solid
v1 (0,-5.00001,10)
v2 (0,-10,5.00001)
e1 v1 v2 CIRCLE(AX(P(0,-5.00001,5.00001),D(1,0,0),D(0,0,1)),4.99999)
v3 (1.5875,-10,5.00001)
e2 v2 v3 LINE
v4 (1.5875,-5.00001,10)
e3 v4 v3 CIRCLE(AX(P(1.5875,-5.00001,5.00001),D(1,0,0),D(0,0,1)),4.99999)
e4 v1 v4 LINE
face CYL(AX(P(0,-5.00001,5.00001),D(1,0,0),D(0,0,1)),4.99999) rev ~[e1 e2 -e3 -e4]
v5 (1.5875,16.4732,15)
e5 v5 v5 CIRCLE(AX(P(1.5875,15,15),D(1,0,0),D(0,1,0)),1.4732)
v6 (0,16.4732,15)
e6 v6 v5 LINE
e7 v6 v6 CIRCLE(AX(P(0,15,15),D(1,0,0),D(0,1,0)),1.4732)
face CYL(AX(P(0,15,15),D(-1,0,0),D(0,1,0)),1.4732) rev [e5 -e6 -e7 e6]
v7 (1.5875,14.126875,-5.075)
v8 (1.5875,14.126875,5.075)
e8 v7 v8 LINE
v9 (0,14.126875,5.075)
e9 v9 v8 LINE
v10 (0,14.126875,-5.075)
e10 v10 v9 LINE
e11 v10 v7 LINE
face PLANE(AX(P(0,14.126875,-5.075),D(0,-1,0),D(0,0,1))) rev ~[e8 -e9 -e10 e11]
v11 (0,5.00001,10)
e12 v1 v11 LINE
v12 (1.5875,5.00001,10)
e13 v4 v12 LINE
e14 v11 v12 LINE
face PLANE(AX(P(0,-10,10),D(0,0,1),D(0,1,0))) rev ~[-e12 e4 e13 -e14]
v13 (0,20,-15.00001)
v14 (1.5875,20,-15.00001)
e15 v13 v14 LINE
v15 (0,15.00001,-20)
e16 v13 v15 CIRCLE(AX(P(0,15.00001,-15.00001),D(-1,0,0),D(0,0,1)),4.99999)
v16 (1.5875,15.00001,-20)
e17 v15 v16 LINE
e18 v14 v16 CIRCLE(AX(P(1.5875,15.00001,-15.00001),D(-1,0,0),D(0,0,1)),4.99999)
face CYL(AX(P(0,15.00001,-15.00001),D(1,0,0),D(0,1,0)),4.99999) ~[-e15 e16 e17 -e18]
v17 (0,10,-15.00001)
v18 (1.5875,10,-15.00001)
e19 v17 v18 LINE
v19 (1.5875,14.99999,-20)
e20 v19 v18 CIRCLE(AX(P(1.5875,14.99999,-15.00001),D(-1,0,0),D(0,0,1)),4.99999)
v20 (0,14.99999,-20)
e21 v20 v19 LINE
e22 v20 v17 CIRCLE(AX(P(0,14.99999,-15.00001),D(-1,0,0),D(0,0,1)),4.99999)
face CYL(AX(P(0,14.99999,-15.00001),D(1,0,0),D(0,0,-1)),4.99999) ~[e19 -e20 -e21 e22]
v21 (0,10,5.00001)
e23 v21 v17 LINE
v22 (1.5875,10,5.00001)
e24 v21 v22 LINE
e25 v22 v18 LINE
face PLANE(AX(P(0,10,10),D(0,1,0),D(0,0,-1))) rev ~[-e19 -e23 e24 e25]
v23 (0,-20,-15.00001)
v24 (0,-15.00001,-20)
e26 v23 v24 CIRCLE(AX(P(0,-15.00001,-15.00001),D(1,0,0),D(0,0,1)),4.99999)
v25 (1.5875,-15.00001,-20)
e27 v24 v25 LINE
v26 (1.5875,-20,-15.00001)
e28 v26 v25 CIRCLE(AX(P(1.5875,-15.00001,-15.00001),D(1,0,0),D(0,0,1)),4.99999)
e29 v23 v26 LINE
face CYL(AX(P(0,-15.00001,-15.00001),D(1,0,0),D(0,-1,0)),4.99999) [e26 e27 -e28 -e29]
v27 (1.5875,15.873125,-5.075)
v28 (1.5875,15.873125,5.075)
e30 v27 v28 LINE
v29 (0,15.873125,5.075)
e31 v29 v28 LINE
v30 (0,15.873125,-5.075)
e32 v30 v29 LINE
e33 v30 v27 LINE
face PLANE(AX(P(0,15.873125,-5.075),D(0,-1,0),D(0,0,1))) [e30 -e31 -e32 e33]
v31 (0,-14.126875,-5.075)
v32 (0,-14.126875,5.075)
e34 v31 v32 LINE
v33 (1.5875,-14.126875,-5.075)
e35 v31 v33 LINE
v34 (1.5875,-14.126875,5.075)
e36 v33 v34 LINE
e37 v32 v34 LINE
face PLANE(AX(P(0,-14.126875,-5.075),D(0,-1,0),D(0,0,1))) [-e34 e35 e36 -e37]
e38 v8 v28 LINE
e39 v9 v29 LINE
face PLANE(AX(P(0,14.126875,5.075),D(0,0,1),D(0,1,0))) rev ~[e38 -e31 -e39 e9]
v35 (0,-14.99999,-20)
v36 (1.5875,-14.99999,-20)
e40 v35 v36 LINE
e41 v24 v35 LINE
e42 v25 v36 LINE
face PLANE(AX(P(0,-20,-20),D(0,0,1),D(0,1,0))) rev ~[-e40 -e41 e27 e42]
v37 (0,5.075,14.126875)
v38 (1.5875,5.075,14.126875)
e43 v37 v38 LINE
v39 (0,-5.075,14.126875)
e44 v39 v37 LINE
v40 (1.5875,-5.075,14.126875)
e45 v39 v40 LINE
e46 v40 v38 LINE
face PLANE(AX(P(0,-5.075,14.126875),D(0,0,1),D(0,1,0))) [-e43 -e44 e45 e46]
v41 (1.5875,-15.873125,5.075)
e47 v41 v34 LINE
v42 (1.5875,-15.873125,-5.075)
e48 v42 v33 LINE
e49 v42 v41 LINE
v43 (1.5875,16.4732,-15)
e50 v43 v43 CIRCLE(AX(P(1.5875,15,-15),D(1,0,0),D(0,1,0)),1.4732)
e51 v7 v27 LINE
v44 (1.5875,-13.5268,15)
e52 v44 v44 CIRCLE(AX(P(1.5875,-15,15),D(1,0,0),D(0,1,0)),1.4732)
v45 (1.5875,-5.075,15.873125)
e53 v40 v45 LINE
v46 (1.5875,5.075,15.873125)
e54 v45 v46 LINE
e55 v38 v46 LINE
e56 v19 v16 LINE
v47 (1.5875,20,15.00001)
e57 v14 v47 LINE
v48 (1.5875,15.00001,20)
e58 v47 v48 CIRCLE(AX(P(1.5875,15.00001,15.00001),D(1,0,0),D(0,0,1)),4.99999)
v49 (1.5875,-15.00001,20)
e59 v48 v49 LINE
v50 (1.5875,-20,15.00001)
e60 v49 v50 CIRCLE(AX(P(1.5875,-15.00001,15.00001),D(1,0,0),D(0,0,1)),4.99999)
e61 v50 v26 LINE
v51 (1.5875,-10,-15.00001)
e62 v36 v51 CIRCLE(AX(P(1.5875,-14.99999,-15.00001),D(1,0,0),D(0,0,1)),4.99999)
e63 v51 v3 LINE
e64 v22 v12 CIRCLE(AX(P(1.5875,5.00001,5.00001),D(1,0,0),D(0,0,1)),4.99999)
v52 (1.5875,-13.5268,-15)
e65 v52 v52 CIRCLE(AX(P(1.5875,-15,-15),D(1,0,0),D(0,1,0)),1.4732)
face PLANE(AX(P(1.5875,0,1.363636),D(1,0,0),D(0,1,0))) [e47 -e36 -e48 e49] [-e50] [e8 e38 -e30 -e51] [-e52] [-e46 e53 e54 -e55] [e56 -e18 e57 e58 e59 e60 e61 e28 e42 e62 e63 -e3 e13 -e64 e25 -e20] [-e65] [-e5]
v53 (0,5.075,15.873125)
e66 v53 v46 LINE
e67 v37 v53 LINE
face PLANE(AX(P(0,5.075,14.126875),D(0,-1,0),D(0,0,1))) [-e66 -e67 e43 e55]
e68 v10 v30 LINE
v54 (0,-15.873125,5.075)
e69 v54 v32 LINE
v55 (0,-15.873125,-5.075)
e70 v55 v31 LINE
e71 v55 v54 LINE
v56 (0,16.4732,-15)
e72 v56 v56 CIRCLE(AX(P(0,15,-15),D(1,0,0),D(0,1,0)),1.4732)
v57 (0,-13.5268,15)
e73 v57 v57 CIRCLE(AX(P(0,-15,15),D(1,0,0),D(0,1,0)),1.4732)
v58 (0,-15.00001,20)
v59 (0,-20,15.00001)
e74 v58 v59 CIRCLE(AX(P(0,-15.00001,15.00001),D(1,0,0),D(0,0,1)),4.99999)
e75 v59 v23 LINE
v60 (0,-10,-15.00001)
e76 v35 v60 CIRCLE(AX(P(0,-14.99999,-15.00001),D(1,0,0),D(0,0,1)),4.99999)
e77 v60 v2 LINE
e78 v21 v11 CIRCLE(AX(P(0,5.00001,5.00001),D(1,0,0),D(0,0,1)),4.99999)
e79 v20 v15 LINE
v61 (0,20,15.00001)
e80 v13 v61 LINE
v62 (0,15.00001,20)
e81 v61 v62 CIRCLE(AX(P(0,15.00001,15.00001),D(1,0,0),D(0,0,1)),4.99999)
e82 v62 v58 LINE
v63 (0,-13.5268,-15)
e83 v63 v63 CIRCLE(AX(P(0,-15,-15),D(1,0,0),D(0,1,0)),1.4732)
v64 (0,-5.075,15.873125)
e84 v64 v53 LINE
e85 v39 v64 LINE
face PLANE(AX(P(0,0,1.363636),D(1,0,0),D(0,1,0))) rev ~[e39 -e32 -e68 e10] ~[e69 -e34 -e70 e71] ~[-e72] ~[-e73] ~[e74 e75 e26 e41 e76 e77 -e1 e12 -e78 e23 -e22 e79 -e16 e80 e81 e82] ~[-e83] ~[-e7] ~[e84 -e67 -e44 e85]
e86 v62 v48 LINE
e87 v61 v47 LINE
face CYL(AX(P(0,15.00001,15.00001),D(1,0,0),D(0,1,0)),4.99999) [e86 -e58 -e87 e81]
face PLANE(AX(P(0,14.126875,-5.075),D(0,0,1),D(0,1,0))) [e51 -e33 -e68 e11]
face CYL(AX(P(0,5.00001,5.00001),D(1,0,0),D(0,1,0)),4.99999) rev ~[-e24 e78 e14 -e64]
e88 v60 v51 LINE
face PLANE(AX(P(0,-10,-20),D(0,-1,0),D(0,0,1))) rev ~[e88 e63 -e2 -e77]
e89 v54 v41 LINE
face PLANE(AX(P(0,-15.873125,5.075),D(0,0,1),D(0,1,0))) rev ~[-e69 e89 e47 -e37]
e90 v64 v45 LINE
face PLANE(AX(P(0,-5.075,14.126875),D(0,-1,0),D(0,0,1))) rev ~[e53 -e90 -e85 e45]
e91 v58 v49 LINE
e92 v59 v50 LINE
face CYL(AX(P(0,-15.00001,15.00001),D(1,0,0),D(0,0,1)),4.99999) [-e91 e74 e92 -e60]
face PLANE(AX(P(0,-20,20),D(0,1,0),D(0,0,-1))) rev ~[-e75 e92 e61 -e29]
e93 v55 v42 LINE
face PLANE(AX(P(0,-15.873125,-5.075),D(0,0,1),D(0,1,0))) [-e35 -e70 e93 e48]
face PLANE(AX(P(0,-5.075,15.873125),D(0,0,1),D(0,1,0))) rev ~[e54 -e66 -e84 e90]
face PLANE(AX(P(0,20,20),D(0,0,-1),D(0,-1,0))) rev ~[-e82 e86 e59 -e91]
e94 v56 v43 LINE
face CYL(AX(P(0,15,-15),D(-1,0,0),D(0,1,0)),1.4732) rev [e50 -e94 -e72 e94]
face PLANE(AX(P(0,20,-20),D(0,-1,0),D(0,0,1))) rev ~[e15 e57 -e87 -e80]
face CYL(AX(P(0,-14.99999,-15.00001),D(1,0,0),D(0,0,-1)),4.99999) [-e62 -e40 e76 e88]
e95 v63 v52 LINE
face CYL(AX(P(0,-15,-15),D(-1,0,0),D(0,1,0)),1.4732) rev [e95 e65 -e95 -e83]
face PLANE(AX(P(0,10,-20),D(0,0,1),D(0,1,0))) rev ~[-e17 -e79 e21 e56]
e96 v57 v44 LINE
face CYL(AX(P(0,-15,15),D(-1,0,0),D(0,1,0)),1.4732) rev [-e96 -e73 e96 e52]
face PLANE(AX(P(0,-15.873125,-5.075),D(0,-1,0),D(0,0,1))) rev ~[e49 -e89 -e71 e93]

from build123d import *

# Parameters (mm, degrees)
F0_R     = 1.4732
F0_W     = 1.74625
F0_H     = 10.15
F0_W_2   = 10.15
F0_H_2   = 1.74625
F1_DEPTH = 1.5875
F2_R     = 4.99999


# Not quite as in the source:
# - a fillet or chamfer is up to 0.001 mm smaller than in the source, because OpenCascade refuses the exact size
# - a length typed as a fraction of an inch, garbled in the dataset ("3 / 203.2 mm" for 3/8 in), is restored


with BuildPart() as f1:
    # F0 (on Right) → F1 (new body)
    with BuildSketch(Plane.YZ):
        Polygon((20, -20), (20, 20), (-20, 20), (-20, -20), (-10, -20), (-10, 10), (10, 10), (10, -20), align=None)
        with Locations((-15, -15)):
            Circle(F0_R, mode=Mode.SUBTRACT)
        with Locations((15, -15)):
            Circle(F0_R, mode=Mode.SUBTRACT)
        with Locations((-15, 0)):
            Rectangle(F0_W, F0_H, mode=Mode.SUBTRACT)
        with Locations((-15, 15)):
            Circle(F0_R, mode=Mode.SUBTRACT)
        with Locations((15, 0)):
            Rectangle(F0_W, F0_H, mode=Mode.SUBTRACT)
        with Locations((0, 15)):
            Rectangle(F0_W_2, F0_H_2, mode=Mode.SUBTRACT)
        with Locations((15, 15)):
            Circle(F0_R, mode=Mode.SUBTRACT)
    extrude(amount=F1_DEPTH)

    # F2 (radius 5 in the source; OpenCascade refuses exactly that, so slightly less here)
    f2_edges = [f1.edges().sort_by_distance(p)[0] for p in [
        (0.79375, -20, 20),
        (0.79375, -20, -20),
        (0.79375, -10, 10),
        (0.79375, -10, -20),
        (0.79375, 10, -20),
        (0.79375, 20, -20),
        (0.79375, 10, 10),
        (0.79375, 20, 20),
    ]]
    fillet(f2_edges, radius=F2_R)


solid = f1.part
